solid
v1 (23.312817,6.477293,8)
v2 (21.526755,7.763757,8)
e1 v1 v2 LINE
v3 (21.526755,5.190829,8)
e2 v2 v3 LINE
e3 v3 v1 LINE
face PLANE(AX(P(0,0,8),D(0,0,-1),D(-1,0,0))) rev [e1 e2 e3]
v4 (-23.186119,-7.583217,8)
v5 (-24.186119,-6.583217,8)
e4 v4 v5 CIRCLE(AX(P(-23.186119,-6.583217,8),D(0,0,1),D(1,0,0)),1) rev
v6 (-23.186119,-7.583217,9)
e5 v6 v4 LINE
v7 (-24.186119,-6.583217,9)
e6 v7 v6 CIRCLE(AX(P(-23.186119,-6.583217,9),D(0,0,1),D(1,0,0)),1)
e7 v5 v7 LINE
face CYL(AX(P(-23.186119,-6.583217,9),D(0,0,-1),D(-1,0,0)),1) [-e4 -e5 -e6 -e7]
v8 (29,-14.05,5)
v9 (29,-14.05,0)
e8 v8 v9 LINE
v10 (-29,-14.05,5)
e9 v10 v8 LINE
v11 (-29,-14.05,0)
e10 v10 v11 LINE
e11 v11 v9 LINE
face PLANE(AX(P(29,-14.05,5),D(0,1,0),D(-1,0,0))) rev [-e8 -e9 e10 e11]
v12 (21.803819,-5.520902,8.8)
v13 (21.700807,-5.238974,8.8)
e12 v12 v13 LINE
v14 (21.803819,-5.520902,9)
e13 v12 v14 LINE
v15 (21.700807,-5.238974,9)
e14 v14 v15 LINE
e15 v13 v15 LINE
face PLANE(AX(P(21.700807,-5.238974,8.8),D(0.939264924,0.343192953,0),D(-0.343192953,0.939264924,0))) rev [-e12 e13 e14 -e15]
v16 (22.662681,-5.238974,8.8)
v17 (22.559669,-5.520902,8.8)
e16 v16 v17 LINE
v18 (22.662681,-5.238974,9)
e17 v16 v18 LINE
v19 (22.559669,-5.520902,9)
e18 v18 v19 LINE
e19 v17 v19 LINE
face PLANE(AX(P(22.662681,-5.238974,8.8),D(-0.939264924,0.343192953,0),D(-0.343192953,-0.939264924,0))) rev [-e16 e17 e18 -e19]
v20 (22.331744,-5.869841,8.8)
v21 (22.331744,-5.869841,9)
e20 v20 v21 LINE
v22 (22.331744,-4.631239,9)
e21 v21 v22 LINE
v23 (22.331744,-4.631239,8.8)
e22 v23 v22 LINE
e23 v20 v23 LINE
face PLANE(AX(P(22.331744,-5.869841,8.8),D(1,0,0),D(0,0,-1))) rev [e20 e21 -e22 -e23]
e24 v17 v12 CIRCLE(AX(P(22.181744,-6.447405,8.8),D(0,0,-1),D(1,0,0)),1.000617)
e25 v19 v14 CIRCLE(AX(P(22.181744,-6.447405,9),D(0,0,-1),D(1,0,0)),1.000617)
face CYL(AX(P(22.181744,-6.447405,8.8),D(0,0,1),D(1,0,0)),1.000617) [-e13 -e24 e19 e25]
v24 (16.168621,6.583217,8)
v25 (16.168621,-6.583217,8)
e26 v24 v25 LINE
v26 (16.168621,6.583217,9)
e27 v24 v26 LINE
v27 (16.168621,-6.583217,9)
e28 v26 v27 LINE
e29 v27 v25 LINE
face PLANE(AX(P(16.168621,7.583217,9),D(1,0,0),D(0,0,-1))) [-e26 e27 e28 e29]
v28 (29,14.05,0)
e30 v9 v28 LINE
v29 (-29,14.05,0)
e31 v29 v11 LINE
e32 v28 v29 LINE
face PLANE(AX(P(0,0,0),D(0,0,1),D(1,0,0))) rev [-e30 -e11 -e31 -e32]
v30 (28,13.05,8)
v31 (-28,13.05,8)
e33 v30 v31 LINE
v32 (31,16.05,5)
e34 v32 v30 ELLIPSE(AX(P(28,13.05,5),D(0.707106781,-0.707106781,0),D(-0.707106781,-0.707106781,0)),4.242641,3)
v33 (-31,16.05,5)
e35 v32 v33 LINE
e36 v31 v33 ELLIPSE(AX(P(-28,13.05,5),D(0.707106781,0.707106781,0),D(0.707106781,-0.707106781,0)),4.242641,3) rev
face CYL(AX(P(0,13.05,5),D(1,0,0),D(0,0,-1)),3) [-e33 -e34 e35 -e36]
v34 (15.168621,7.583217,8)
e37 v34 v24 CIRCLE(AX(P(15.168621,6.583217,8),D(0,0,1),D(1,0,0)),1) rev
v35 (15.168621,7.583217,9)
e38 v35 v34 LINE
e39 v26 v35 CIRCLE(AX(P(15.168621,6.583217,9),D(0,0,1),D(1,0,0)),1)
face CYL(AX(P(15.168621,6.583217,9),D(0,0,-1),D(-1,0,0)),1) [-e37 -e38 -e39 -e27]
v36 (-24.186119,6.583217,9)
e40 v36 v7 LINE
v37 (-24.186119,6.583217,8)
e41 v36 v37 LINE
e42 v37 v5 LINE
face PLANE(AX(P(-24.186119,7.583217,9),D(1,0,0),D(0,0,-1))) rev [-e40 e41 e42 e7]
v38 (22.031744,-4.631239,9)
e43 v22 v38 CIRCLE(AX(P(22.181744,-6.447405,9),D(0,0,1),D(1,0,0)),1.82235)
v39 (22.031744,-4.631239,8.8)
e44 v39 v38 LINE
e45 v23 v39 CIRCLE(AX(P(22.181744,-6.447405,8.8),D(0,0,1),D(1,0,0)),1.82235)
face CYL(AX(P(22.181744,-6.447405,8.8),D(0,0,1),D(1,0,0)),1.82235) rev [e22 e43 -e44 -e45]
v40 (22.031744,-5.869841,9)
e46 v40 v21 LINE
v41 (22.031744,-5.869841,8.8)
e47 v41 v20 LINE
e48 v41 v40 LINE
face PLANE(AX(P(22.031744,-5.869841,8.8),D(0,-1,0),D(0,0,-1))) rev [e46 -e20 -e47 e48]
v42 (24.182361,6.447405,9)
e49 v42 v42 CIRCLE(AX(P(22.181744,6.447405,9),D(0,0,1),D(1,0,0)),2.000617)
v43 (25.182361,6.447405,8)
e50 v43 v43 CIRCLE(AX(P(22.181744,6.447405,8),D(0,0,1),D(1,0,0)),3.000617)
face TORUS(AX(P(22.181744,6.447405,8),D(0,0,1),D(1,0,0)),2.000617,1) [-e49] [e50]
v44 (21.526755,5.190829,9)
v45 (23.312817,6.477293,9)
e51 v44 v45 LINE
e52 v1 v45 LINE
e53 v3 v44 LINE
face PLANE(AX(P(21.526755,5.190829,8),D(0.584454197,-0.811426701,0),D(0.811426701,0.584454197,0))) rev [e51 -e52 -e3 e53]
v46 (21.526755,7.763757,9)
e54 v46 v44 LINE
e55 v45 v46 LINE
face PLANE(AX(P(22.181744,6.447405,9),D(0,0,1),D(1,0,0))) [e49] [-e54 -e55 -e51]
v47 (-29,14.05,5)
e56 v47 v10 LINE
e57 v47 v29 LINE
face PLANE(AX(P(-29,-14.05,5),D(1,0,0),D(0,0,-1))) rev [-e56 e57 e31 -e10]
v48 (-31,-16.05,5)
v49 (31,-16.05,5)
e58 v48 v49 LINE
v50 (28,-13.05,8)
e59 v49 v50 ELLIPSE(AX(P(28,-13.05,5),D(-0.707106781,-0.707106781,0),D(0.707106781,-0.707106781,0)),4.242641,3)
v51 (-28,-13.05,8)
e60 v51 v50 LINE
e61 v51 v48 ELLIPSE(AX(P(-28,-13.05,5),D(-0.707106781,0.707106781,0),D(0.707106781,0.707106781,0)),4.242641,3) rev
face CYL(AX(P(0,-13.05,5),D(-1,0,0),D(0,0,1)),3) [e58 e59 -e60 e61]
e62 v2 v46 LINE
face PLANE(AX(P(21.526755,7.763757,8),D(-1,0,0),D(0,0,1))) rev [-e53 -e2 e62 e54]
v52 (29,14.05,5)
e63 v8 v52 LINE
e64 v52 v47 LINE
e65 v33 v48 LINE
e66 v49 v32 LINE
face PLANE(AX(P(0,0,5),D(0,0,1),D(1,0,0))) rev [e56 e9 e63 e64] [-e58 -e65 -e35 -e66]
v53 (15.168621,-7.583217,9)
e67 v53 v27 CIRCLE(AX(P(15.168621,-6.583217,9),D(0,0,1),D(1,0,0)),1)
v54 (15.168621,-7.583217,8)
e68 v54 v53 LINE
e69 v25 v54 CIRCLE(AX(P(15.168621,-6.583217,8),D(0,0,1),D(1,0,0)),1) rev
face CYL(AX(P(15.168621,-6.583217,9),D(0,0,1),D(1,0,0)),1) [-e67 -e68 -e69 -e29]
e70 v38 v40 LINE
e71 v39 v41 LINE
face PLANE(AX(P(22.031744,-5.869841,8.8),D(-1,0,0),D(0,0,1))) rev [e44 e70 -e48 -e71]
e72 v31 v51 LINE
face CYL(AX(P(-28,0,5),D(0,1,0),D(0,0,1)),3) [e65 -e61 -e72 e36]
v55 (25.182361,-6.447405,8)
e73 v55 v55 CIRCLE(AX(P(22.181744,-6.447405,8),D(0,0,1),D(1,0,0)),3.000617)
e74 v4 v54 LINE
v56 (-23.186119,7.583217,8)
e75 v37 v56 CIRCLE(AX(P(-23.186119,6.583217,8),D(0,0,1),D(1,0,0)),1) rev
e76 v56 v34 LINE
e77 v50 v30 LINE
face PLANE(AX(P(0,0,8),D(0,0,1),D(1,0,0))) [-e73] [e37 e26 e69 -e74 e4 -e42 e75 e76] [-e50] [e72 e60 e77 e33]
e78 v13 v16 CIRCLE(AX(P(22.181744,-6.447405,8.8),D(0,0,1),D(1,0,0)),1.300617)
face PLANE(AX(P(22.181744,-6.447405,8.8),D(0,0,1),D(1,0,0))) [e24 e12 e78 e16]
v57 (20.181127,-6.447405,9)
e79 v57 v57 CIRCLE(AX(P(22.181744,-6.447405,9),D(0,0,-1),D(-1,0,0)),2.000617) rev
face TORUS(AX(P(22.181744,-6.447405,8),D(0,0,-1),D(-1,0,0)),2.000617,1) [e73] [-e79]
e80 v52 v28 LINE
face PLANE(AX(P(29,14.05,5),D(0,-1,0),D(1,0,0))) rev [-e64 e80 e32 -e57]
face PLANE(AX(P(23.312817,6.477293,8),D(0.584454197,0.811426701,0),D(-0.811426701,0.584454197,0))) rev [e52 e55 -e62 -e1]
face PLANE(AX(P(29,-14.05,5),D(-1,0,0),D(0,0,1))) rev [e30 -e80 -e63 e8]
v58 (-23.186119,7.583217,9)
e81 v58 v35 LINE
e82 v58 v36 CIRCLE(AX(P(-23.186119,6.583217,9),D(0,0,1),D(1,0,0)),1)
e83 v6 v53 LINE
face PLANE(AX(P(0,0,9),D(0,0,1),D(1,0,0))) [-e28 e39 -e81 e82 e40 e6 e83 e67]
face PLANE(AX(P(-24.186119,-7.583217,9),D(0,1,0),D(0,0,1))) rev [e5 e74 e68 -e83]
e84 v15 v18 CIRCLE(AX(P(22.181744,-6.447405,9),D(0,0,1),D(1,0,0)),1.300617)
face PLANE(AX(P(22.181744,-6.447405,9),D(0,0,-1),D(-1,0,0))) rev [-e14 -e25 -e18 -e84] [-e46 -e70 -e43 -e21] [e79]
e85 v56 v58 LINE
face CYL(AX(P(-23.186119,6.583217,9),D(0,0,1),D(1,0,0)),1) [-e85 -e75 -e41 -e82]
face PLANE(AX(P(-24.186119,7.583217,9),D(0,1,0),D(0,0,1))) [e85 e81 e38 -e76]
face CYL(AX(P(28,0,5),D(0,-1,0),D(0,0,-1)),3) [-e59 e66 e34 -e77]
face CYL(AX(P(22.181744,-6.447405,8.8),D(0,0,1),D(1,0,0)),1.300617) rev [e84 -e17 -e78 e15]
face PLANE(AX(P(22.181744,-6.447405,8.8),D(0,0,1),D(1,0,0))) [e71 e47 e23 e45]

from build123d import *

# Parameters (mm, degrees)
SKETCH1_W           = 58
SKETCH1_H           = 28.1
BOSS_EXTRUDE1_DEPTH = 5
SKETCH2_W           = 62
SKETCH2_H           = 32.1
BOSS_EXTRUDE2_DEPTH = 3
FILLET1_R           = 3
SKETCH3_W           = 40.354739258
SKETCH3_H           = 15.166433462
BOSS_EXTRUDE3_DEPTH = 1
SKETCH3_6_R         = 3.000616935
BOSS_EXTRUDE4_DEPTH = 1
FILLET2_R           = 1
CUT_EXTRUDE2_DEPTH  = 1
CUT_EXTRUDE3_DEPTH  = 0.2
FILLET3_R           = 1


with BuildPart() as part:
    # Sketch1 → Boss-Extrude1 (new body)
    with BuildSketch(Plane.XY):
        Rectangle(SKETCH1_W, SKETCH1_H)
    extrude(amount=BOSS_EXTRUDE1_DEPTH)

    # Sketch2 → Boss-Extrude2 (add)
    with BuildSketch(Plane.XY.offset(5)):
        Rectangle(SKETCH2_W, SKETCH2_H)
    extrude(amount=BOSS_EXTRUDE2_DEPTH)

    # Fillet1
    fillet1_edges = [part.edges().sort_by_distance(p)[0] for p in [
        (0, -16.05, 8),
        (-31, 0, 8),
        (0, 16.05, 8),
        (31, 0, 8),
    ]]
    fillet(fillet1_edges, radius=FILLET1_R - 0.0001)  # a hair under: the kernel refuses the full size

    # Sketch3 → Boss-Extrude3 (add)
    with BuildSketch(Plane.XY.offset(8)):
        with Locations((-4.008748933, 0)):
            Rectangle(SKETCH3_W, SKETCH3_H)
    extrude(amount=BOSS_EXTRUDE3_DEPTH)

    # Sketch3<6> → Boss-Extrude4 (add)
    with BuildSketch(Plane.XY.offset(8)):
        with Locations((22.181744095, 6.447404534)):
            Circle(SKETCH3_6_R)
        with Locations(Location((22.181744095, -6.447404534, 0), (0, 0, 180))):
            Circle(SKETCH3_6_R)
    extrude(amount=BOSS_EXTRUDE4_DEPTH)

    # Fillet2
    fillet2_edges = [part.edges().sort_by_distance(p)[0] for p in [
        (19.18112716, 6.447404534, 9),
        (25.182361031, -6.447404534, 9),
    ]]
    fillet(fillet2_edges, radius=FILLET2_R - 0.0001)  # a hair under: the kernel refuses the full size

    # Sketch4 → Cut-Extrude2 (cut)
    with BuildSketch(Plane.XY.offset(9)):
        Polygon((21.526754794, 7.76375697), (21.526754794, 5.190828819), (23.312816568, 6.477292894), align=None)
    extrude(amount=-CUT_EXTRUDE2_DEPTH, mode=Mode.SUBTRACT)

    # Sketch5 → Cut-Extrude3 (cut)
    with BuildSketch(Plane.XY.offset(9)):
        with BuildLine():
            Line((22.662681188, -5.238974178), (22.559669099, -5.520902001))
            ThreePointArc((22.559669099, -5.520902001), (22.181744095, -7.448021469), (21.803819092, -5.520902001))
            Line((21.803819092, -5.520902001), (21.700807003, -5.238974178))
            ThreePointArc((21.700807003, -5.238974178), (22.181744095, -7.748021469), (22.662681188, -5.238974178))
        make_face()
        with BuildLine():
            Line((22.331744095, -5.86984139), (22.331744095, -4.631238623))
            ThreePointArc((22.331744095, -4.631238623), (22.181744095, -4.625054783), (22.031744095, -4.631238623))
            Line((22.031744095, -4.631238623), (22.031744095, -5.86984139))
            Line((22.031744095, -5.86984139), (22.331744095, -5.86984139))
        make_face()
    extrude(amount=-CUT_EXTRUDE3_DEPTH, mode=Mode.SUBTRACT)

    # Fillet3
    fillet3_edges = [part.edges().sort_by_distance(p)[0] for p in [
        (-24.186118562, 7.583216731, 8.5),
        (-24.186118562, -7.583216731, 8.5),
        (16.168620696, -7.583216731, 8.5),
        (16.168620696, 7.583216731, 8.5),
    ]]
    fillet(fillet3_edges, radius=FILLET3_R)


solid = part.part
